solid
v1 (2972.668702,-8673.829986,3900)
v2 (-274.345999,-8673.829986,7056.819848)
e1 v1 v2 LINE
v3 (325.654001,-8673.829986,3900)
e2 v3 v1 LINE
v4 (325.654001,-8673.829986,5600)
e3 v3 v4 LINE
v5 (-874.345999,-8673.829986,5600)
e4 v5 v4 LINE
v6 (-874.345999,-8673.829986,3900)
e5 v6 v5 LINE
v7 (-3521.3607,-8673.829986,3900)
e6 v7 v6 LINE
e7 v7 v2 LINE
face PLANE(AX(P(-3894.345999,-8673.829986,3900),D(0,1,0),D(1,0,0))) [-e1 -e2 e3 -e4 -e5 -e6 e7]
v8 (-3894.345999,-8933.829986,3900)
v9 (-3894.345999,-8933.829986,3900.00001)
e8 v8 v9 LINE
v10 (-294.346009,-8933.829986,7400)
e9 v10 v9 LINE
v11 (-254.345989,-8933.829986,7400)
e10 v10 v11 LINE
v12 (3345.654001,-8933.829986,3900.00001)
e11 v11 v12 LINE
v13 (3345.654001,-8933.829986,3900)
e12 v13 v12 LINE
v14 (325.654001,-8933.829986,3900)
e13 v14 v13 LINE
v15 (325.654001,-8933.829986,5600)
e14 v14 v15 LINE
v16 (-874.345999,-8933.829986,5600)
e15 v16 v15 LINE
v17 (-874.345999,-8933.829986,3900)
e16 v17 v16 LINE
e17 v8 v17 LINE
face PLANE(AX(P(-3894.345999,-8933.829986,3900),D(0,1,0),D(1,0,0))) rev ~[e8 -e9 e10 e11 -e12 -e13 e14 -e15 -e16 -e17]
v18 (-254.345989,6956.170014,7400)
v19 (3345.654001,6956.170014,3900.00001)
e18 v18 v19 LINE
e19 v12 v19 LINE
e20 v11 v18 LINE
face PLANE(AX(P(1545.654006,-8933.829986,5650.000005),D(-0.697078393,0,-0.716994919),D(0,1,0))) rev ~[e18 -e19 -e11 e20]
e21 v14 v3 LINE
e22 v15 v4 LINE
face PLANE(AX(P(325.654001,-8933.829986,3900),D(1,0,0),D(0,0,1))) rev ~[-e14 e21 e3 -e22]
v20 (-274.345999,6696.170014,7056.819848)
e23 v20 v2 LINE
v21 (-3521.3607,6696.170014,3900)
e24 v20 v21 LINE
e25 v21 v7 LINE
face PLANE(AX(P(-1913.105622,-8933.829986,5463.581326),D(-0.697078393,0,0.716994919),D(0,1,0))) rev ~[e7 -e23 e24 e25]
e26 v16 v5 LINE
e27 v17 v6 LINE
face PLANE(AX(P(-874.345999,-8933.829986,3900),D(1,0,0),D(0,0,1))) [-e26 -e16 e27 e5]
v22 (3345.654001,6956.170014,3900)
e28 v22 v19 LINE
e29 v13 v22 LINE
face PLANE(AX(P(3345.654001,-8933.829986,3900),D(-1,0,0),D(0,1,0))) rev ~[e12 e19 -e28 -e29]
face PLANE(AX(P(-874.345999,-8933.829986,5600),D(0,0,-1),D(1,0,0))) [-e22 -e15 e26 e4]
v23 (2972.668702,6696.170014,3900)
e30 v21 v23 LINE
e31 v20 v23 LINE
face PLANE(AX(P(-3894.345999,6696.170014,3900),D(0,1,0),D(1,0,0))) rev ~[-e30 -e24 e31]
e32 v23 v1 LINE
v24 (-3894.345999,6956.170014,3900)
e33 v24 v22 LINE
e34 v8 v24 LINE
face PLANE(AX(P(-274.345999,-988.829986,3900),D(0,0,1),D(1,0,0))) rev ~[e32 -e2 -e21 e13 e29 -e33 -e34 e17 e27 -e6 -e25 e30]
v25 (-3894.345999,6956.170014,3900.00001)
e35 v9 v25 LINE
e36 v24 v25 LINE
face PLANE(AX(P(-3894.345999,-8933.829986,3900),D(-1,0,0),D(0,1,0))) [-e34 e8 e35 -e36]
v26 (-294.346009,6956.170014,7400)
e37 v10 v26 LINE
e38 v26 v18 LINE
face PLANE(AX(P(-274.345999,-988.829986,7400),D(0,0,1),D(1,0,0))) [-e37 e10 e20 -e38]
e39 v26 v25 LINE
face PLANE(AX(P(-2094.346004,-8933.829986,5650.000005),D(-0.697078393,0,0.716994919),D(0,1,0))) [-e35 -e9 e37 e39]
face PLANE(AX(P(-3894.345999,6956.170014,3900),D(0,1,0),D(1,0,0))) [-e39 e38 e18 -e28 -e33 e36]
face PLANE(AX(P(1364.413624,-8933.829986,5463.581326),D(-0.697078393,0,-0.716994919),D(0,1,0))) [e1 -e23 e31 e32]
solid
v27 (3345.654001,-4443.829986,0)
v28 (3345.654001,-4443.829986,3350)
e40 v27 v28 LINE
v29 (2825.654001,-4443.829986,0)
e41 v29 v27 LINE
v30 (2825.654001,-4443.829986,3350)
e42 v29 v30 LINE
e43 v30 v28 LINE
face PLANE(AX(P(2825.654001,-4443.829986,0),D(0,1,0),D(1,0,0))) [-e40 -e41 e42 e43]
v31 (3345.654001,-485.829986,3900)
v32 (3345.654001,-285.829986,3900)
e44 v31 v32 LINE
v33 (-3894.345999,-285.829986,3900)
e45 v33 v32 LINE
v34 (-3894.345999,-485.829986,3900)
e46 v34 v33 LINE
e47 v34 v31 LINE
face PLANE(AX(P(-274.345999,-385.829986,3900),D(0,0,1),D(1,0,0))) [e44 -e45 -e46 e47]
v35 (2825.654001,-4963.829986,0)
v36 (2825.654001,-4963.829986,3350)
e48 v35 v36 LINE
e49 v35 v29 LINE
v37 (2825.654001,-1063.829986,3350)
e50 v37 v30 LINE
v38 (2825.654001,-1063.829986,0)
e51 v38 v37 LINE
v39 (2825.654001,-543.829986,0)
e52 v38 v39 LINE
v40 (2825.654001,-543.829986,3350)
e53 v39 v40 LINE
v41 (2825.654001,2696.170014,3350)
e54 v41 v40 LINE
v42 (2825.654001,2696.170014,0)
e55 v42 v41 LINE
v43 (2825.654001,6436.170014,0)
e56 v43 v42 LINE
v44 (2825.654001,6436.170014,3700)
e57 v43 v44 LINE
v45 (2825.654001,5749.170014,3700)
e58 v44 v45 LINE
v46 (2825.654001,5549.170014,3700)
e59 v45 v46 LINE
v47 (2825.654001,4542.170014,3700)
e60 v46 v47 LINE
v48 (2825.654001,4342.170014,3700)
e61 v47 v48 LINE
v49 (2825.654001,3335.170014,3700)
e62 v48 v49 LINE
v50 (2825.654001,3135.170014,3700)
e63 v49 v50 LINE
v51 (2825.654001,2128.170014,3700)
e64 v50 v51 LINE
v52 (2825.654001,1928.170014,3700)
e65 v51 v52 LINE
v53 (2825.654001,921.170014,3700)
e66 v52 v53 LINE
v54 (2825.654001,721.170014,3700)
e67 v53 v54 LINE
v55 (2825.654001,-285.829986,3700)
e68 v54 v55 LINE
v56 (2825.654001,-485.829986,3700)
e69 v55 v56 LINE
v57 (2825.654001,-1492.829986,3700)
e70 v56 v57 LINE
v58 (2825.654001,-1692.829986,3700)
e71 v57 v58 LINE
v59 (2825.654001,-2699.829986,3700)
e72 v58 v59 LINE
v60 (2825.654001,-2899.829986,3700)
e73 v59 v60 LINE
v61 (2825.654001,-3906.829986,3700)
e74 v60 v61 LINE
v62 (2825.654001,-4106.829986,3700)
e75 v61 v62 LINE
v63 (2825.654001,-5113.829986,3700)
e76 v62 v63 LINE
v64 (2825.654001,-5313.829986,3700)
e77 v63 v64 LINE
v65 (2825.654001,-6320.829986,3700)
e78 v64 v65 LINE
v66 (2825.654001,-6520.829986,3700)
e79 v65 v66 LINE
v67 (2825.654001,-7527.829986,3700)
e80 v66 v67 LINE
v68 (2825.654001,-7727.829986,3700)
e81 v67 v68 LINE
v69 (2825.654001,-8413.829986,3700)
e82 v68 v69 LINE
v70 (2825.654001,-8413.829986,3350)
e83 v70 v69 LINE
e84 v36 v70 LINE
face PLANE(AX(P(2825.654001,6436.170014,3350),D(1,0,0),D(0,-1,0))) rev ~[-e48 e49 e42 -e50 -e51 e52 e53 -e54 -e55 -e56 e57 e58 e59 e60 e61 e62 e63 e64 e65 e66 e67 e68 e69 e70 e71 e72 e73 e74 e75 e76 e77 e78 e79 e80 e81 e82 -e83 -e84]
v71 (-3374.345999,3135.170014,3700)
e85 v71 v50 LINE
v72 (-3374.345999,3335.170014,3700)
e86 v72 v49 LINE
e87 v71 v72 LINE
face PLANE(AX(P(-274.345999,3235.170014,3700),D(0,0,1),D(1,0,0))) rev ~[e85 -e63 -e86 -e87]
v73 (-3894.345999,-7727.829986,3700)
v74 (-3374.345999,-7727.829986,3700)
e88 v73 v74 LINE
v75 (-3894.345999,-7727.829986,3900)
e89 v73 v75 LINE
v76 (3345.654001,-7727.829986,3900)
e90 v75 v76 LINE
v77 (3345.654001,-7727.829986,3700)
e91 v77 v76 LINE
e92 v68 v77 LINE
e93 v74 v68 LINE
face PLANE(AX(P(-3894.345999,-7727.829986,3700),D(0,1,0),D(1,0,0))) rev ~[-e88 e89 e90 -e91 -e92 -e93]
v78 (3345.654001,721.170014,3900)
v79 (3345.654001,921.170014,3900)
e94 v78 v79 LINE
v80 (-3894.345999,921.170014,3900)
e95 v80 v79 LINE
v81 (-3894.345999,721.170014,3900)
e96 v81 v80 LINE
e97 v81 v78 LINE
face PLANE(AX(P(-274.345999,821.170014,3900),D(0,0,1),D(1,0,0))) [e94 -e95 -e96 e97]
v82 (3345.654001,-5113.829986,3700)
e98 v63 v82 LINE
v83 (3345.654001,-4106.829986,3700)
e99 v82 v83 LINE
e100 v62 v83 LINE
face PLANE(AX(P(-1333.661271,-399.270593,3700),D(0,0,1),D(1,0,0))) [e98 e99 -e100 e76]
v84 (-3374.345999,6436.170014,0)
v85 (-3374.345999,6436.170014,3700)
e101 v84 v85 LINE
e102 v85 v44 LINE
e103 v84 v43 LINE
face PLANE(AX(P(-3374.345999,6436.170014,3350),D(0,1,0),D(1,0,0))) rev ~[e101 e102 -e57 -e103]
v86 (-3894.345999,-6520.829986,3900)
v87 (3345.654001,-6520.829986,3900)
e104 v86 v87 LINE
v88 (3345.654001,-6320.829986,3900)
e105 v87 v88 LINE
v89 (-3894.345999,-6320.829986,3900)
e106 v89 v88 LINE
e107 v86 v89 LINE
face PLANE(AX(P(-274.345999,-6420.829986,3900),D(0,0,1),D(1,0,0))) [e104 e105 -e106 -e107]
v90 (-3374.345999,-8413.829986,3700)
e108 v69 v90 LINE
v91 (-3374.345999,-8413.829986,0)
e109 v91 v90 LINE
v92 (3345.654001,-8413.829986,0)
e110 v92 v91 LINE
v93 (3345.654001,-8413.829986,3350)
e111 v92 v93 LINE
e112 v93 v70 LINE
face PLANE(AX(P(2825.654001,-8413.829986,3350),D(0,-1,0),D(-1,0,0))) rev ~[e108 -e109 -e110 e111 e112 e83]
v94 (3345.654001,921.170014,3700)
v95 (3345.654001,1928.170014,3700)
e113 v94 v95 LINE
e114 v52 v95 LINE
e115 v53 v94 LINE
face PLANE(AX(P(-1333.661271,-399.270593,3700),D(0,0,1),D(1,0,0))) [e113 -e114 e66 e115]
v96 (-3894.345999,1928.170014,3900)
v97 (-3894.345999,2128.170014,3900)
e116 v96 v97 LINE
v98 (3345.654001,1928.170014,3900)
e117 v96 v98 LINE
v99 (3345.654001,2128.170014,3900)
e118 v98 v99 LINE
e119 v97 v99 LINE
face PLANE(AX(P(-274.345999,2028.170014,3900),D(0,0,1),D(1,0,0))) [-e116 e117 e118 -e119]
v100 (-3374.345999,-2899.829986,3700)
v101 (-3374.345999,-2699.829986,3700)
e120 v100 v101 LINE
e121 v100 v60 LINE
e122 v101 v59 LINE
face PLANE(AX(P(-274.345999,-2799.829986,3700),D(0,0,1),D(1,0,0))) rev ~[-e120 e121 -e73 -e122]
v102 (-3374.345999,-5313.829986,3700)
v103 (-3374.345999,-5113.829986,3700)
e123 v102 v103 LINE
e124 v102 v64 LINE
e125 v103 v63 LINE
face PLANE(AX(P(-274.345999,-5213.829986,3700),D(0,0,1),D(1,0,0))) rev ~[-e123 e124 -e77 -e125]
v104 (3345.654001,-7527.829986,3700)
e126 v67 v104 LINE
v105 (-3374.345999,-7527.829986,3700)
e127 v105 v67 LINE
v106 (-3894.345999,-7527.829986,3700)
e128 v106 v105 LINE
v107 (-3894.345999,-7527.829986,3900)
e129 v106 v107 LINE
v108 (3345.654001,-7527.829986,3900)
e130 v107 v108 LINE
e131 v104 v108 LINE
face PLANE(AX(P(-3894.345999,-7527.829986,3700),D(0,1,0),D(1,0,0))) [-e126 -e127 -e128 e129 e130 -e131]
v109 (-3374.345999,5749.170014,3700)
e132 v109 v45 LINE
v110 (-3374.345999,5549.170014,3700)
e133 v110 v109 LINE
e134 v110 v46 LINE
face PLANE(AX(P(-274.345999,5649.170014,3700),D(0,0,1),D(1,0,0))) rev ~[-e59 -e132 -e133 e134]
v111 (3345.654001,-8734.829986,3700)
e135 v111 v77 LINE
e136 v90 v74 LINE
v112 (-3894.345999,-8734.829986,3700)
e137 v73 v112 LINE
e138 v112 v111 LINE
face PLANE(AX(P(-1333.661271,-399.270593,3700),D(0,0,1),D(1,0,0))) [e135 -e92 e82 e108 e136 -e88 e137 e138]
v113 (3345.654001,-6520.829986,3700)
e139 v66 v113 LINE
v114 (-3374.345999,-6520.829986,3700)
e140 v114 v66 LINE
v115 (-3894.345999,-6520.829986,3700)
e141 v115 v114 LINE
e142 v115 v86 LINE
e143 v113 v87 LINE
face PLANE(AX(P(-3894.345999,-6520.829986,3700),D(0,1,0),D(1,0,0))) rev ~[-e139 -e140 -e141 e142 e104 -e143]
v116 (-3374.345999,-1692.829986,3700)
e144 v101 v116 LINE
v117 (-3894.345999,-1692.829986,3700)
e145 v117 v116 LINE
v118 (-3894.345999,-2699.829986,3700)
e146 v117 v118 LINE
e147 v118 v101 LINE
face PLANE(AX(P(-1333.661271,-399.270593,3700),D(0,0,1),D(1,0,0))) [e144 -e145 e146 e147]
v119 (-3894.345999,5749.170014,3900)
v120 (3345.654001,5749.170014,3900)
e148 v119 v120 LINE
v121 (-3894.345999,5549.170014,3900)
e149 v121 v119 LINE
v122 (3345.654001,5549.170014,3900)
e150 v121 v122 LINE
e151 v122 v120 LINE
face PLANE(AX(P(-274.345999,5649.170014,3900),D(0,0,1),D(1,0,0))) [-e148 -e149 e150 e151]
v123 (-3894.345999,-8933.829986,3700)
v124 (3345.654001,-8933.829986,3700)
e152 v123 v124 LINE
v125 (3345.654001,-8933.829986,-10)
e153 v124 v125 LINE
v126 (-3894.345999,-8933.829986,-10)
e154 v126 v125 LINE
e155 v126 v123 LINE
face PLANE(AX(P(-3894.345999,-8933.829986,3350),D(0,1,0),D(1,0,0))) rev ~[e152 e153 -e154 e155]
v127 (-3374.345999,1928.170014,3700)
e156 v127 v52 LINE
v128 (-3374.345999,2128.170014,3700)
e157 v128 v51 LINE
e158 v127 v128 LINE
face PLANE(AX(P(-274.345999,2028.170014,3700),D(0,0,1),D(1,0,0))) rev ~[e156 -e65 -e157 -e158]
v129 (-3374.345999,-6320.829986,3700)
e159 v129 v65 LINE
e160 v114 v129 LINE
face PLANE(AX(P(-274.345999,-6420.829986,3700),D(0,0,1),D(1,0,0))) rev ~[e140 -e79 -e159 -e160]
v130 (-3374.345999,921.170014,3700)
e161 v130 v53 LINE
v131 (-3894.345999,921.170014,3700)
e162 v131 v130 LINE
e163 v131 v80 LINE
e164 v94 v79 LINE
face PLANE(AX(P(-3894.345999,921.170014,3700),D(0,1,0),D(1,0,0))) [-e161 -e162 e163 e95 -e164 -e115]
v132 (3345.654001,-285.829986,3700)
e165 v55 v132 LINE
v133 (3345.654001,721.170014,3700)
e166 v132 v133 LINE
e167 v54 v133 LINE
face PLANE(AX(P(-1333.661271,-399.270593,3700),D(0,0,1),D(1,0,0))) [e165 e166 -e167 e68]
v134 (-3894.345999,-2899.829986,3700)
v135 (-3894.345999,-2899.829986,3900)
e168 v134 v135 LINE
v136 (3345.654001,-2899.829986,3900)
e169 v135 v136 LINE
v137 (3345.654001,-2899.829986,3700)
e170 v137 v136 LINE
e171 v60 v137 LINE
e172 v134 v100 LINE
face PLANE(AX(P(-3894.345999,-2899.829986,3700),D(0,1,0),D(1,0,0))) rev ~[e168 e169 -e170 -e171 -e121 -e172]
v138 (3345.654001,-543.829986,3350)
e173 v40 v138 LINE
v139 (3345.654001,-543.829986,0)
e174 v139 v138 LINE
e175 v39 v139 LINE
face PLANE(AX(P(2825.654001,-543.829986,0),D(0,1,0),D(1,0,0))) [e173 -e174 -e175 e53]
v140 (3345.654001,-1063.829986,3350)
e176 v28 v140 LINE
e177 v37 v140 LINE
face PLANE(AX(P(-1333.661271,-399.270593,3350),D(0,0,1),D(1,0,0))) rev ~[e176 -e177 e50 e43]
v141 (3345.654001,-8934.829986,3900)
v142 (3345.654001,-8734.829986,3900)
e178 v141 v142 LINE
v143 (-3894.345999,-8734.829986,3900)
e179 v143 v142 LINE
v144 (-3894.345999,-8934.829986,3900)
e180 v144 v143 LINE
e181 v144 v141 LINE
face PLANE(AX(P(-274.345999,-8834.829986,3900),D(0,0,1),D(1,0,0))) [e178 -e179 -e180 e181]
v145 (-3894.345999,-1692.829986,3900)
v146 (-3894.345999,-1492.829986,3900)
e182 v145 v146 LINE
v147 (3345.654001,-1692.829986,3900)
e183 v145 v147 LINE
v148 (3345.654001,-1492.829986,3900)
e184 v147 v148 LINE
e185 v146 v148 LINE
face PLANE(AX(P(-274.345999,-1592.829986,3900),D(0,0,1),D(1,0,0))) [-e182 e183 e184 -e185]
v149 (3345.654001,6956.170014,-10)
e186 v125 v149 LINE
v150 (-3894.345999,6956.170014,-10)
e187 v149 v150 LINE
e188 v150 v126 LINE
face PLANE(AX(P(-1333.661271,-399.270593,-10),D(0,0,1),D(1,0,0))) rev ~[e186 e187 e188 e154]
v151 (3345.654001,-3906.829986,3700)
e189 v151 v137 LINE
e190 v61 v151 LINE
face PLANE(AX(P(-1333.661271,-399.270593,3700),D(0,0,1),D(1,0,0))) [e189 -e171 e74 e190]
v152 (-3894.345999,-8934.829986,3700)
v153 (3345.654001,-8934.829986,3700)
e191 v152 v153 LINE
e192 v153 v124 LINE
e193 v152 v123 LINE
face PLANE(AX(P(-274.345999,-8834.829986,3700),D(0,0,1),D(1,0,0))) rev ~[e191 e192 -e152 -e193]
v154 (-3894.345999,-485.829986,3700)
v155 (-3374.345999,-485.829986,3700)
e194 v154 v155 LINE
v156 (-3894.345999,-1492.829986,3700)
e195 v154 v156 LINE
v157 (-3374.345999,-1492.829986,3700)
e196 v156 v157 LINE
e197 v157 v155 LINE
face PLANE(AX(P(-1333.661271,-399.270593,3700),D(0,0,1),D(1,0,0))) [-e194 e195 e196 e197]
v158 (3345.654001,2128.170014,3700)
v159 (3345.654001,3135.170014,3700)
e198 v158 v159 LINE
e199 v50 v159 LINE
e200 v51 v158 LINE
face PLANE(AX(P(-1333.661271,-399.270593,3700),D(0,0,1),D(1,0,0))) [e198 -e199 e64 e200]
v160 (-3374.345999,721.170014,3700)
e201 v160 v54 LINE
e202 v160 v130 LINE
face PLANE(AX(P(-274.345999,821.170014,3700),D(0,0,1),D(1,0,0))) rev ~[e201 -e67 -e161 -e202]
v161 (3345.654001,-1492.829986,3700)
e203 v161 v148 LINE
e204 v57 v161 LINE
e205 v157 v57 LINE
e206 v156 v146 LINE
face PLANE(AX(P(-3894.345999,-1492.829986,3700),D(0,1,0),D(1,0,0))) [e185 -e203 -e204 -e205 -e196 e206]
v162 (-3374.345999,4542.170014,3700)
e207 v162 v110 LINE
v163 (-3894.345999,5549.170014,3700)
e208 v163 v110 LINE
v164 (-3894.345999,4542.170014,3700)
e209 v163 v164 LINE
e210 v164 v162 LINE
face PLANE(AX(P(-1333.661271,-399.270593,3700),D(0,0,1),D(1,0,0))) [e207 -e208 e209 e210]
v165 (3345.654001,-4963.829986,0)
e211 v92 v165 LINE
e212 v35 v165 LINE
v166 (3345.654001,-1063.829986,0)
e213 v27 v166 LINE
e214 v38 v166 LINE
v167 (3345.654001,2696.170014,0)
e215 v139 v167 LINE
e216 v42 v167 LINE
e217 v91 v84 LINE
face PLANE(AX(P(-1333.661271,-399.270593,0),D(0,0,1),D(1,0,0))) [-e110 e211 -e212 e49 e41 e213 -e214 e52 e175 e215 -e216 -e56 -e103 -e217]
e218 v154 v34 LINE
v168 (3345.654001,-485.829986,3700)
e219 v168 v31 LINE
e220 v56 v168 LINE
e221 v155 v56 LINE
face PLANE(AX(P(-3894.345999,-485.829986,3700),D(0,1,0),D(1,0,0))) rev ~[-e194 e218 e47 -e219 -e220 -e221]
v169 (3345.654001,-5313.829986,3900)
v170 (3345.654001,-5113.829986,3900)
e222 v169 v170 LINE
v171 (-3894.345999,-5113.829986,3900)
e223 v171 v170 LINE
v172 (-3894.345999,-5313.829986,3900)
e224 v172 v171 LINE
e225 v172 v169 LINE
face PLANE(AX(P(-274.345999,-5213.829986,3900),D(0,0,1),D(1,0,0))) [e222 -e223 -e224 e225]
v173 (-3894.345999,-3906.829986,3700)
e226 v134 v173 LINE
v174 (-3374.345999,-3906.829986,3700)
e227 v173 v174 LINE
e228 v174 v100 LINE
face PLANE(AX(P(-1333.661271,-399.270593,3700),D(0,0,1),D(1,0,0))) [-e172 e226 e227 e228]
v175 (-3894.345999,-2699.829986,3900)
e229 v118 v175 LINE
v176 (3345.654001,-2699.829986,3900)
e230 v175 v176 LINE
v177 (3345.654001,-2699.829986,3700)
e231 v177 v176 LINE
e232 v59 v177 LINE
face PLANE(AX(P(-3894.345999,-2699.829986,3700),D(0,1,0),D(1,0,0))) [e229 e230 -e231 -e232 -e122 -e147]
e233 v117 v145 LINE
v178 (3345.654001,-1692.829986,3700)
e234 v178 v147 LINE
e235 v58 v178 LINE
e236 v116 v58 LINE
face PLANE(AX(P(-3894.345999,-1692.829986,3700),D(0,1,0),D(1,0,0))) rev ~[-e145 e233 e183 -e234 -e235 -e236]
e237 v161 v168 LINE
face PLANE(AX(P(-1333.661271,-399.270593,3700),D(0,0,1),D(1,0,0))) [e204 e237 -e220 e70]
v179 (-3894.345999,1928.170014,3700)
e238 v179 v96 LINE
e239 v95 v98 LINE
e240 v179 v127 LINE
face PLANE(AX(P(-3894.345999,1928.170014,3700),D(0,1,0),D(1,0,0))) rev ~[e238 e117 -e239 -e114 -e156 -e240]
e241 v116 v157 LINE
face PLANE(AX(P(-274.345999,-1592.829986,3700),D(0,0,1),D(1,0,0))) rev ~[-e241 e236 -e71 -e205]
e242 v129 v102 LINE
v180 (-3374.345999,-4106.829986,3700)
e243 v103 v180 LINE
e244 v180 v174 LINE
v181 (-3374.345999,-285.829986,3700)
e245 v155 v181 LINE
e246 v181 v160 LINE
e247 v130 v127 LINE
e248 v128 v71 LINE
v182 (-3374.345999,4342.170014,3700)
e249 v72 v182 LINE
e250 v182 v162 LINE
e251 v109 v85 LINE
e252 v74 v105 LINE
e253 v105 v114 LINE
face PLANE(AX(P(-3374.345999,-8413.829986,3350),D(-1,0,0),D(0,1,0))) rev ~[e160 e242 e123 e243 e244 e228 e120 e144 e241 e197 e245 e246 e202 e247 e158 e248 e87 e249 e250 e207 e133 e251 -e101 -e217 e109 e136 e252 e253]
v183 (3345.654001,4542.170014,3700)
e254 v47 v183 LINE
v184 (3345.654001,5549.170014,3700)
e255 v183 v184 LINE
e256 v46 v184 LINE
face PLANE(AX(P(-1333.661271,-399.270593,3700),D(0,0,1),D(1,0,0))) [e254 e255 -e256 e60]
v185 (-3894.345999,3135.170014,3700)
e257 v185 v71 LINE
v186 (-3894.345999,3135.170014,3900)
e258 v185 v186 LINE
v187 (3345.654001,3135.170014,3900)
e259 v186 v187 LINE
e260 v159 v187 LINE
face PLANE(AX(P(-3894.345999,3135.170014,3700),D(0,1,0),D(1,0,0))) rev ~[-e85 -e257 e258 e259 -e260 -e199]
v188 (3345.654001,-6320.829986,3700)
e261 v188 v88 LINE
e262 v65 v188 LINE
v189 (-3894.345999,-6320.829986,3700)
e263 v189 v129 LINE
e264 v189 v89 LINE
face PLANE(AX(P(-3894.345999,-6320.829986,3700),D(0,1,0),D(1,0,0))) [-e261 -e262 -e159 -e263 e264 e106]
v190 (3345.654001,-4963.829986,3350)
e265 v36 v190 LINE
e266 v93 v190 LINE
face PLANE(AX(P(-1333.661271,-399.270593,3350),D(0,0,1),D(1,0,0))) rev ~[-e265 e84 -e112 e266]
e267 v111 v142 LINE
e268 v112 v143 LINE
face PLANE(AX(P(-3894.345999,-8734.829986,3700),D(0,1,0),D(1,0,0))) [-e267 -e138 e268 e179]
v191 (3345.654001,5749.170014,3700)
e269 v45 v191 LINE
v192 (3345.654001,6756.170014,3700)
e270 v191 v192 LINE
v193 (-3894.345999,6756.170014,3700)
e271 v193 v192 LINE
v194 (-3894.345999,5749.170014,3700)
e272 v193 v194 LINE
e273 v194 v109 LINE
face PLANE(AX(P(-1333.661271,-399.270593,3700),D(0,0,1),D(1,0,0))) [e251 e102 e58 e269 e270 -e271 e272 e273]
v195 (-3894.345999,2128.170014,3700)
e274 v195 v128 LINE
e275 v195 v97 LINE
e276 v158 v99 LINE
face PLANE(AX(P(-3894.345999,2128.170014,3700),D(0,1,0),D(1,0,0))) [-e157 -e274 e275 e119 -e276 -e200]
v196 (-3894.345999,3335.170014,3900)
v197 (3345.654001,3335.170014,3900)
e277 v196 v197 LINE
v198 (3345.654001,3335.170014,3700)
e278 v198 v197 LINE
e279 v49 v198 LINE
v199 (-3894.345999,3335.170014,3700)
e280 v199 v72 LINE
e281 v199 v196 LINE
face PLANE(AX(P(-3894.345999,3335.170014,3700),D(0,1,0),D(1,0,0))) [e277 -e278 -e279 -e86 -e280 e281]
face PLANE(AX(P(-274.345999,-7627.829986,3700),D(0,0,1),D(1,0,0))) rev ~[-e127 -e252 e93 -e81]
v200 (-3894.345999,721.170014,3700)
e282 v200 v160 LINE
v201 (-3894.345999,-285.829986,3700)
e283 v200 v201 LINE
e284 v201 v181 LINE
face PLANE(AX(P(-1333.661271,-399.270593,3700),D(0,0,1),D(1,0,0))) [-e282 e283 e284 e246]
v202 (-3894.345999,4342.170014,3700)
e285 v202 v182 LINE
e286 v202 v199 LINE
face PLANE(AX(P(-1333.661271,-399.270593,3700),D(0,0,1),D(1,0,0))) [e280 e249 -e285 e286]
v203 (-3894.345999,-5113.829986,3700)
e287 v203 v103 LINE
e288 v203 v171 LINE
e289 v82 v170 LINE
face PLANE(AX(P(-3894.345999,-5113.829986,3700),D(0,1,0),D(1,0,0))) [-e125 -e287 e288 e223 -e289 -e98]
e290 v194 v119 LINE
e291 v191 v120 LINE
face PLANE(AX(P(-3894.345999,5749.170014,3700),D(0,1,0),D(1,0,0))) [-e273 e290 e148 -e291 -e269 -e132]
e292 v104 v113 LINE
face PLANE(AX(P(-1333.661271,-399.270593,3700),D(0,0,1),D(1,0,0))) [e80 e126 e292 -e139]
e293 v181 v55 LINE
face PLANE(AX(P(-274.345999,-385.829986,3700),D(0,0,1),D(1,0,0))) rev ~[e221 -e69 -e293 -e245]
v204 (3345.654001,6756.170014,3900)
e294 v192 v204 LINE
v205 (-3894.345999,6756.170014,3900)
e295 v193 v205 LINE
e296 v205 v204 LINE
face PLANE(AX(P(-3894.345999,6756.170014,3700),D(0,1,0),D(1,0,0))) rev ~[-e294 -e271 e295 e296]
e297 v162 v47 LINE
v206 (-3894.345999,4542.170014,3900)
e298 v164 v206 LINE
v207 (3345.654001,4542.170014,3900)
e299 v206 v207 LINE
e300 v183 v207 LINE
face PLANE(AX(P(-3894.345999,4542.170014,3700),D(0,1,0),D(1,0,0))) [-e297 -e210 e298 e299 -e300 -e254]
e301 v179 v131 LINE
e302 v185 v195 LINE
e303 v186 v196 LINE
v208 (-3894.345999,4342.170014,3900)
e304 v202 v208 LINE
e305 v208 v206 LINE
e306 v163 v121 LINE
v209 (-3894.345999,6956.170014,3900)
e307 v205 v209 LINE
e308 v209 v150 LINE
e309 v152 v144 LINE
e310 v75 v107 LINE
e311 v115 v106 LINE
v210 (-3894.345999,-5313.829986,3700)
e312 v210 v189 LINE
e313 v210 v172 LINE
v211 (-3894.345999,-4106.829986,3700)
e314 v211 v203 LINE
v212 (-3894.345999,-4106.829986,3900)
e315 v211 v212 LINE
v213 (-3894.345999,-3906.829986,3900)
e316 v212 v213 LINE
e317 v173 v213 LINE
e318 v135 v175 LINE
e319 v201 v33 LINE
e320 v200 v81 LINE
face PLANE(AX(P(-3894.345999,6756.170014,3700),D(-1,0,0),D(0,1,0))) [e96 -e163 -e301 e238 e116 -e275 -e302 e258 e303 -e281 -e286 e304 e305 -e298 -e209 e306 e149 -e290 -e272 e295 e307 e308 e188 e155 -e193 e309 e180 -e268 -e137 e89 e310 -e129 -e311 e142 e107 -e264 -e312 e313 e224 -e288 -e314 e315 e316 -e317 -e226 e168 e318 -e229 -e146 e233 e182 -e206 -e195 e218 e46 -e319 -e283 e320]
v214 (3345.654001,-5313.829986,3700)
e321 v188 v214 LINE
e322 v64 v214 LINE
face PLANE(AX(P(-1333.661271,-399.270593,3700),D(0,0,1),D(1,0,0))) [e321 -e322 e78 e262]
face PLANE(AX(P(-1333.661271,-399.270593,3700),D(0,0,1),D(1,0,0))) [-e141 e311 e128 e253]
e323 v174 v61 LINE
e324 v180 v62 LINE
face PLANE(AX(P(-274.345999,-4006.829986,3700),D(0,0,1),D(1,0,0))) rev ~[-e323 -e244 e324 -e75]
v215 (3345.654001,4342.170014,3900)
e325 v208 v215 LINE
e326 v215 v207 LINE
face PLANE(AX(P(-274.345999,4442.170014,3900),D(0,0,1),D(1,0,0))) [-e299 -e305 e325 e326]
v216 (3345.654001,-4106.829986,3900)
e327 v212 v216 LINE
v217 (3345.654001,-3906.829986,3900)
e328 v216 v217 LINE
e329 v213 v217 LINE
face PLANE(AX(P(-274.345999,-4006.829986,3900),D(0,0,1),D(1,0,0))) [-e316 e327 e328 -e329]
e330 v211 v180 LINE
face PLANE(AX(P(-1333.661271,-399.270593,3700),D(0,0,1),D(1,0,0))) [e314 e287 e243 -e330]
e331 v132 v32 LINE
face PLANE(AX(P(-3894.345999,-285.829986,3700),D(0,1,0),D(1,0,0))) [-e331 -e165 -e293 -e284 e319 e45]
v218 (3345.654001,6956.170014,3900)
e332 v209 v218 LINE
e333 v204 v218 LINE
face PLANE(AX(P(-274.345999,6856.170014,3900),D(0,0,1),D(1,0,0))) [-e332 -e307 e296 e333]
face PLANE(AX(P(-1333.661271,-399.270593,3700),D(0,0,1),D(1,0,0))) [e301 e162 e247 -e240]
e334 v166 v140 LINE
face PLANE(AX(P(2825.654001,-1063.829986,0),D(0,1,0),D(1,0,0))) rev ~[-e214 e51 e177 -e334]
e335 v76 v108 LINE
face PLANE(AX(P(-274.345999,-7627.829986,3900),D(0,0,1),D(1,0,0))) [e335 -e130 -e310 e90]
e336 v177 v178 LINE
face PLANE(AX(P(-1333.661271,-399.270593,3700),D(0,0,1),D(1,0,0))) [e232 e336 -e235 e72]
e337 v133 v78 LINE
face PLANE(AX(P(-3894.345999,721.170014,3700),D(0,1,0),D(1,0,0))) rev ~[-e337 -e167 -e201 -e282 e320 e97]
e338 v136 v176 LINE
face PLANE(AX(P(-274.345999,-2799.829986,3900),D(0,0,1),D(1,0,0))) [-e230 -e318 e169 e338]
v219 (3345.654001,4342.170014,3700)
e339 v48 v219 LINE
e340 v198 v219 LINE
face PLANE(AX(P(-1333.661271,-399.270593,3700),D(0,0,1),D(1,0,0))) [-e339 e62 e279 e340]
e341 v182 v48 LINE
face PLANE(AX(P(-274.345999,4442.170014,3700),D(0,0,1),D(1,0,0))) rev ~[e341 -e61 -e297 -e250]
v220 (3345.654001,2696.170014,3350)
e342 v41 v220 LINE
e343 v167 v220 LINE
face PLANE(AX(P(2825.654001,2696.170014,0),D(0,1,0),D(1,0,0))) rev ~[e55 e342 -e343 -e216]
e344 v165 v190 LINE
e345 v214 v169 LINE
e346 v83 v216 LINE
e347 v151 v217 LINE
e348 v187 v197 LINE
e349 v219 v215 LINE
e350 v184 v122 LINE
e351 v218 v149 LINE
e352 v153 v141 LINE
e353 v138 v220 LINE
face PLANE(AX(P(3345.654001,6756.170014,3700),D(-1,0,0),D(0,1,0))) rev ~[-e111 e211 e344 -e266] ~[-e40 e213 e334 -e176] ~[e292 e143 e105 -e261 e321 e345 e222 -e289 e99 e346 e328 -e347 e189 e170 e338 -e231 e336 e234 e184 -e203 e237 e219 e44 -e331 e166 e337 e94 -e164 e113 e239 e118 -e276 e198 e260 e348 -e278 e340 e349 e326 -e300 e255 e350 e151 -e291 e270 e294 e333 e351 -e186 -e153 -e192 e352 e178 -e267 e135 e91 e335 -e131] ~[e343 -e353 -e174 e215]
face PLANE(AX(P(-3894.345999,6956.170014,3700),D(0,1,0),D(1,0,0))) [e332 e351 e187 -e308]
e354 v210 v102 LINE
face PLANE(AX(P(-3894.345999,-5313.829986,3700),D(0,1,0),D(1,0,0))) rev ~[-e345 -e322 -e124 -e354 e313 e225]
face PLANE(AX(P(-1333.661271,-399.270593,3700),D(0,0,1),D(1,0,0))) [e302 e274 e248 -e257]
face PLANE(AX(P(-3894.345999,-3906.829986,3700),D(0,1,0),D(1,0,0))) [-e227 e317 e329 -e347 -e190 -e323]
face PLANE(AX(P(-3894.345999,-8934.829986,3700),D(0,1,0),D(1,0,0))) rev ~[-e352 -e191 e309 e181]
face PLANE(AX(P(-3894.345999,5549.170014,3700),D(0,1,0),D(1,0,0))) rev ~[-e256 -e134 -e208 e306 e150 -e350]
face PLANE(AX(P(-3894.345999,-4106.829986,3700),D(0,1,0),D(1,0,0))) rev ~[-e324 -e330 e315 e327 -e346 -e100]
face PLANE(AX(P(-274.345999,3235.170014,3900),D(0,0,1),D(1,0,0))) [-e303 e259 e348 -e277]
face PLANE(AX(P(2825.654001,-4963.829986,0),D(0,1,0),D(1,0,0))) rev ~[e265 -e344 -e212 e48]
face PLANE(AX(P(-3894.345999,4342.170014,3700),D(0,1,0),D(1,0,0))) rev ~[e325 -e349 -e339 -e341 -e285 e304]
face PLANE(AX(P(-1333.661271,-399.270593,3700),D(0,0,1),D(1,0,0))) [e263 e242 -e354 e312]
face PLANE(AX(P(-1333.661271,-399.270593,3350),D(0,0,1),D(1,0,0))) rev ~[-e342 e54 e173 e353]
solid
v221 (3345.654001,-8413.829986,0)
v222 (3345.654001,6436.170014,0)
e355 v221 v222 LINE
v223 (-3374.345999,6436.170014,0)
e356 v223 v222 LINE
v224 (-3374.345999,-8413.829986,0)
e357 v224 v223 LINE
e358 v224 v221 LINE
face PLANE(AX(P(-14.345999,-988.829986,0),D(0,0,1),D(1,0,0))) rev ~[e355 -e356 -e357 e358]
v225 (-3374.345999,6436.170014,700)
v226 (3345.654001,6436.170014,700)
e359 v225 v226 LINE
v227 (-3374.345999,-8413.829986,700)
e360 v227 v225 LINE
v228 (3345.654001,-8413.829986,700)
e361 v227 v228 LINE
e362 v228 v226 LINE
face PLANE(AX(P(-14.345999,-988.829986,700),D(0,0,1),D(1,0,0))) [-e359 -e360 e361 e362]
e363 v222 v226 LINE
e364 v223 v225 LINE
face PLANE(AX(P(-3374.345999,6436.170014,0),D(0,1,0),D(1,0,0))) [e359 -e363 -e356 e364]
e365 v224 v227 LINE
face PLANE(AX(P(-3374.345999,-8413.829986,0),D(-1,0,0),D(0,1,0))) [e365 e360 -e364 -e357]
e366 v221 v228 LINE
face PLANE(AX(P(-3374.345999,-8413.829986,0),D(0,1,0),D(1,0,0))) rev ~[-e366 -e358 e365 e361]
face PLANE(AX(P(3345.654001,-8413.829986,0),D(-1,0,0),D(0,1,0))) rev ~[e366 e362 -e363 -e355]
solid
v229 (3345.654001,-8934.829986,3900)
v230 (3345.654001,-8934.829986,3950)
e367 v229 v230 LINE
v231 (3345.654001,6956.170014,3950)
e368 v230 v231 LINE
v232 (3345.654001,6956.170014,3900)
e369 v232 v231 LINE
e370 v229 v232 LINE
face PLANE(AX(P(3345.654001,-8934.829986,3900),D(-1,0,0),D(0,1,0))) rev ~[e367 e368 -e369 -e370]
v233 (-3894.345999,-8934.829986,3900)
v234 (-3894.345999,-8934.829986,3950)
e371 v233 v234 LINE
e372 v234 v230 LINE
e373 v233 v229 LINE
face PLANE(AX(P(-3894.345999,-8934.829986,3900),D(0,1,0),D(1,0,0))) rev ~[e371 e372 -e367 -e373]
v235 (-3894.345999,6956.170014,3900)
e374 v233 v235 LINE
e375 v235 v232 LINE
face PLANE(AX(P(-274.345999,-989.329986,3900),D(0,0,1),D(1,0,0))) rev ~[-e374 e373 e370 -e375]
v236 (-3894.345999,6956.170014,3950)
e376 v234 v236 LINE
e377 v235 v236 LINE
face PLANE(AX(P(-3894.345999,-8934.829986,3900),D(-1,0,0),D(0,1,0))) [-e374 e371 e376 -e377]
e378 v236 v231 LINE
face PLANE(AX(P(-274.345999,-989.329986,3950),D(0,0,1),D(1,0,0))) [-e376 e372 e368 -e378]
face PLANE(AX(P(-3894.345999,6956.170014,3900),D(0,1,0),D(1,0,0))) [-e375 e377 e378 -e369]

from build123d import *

# Parameters (mm, degrees)
F0_W      = 520
F0_H      = 3240
F0_H_2    = 520
F0_H_3    = 3380
F0_H_4    = 3450
F1_DEPTH  = 10
F2_DEPTH  = 3350
F3_W      = 520
F3_H      = 11110
F4_DEPTH  = 350
F5_W      = 7240
F5_H      = 200
F6_DEPTH  = 200
F7_W      = 7240
F7_H      = 15890
F8_DEPTH  = 3500
F9_SIZE2  = 3499.99999
F9_SIZE   = 3599.99999
F10_T     = 260
F11_W     = 1200
F11_H     = 1700
F12_DEPTH = 260
F13_W     = 6720
F13_H     = 14850
F14_DEPTH = 700
F15_W     = 7240
F15_H     = 15891
F16_DEPTH = 50


# Not quite as in the source:
# - a fillet or chamfer is up to 0.001 mm smaller than in the source, because OpenCascade refuses the exact size
# - a shell that OpenCascade refuses in one call is made with other operations: the cavity is built on its own and cut out


with BuildPart() as f1:
    # F0 (on Top) → F1 (new body)
    with BuildSketch(Plane.XY):
        Polygon((-3374.345998764, -8413.8299859681), (-3374.345998764, 6436.1700140319), (2825.654001236, 6436.1700140319), (2825.654001236, 2696.170014032), (3345.654001236, 2696.170014032), (3345.654001236, 6956.1700140319), (-3894.345998764, 6956.1700140319), (-3894.345998764, -8933.8299859681), (3345.654001236, -8933.8299859681), (3345.654001236, -8413.8299859681), (2825.654001236, -8413.8299859681), align=None)
        Polygon((2825.654001236, 6436.1700140319), (-3374.345998764, 6436.1700140319), (-3374.345998764, -8413.8299859681), (2825.654001236, -8413.8299859681), (2825.654001236, -4963.8299859681), (2825.654001236, -4443.829985968), (2825.654001236, -1063.8299859681), (2825.654001236, -543.829985968), (2825.654001236, 2696.170014032), align=None)
        with Locations((3085.654001236, 1076.170014032)):
            Rectangle(F0_W, F0_H)
        with Locations((3085.654001236, -803.829985968)):
            Rectangle(F0_W, F0_H_2)
        with Locations((3085.654001236, -2753.829985968)):
            Rectangle(F0_W, F0_H_3)
        with Locations((3085.654001236, -6688.8299859681)):
            Rectangle(F0_W, F0_H_4)
        with Locations((3085.654001236, -4703.8299859681)):
            Rectangle(F0_W, F0_H_2)
    extrude(amount=-F1_DEPTH)

    # F0 (on Top) → F2 (join)
    with BuildSketch(Plane.XY):
        with Locations((3085.654001236, -803.829985968)):
            Rectangle(F0_W, F0_H_2)
        with Locations((3085.654001236, -4703.8299859681)):
            Rectangle(F0_W, F0_H_2)
        Polygon((-3374.345998764, -8413.8299859681), (-3374.345998764, 6436.1700140319), (2825.654001236, 6436.1700140319), (2825.654001236, 2696.170014032), (3345.654001236, 2696.170014032), (3345.654001236, 6956.1700140319), (-3894.345998764, 6956.1700140319), (-3894.345998764, -8933.8299859681), (3345.654001236, -8933.8299859681), (3345.654001236, -8413.8299859681), (2825.654001236, -8413.8299859681), align=None)
    extrude(amount=F2_DEPTH)

    # F3 (on face) → F4 (join)
    with BuildSketch(Plane.XY.offset(3350)):
        Polygon((3345.654001236, 6956.1700140319), (-3894.345998764, 6956.1700140319), (-3894.345998764, -8933.8299859681), (3345.654001236, -8933.8299859681), (3345.654001236, -8413.8299859681), (2825.654001236, -8413.8299859681), (-3374.345998764, -8413.8299859681), (-3374.345998764, 6436.1700140319), (2825.654001236, 6436.1700140319), (2825.654001236, 2696.170014032), (3345.654001236, 2696.170014032), align=None)
        with Locations((3085.654001236, -2858.8299859681)):
            Rectangle(F3_W, F3_H)
    extrude(amount=F4_DEPTH)

    # F5 (on face) → F6 (join)
    with BuildSketch(Plane.XY.offset(3700)):
        with Locations((-274.345998764, 6856.1700140319)):
            Rectangle(F5_W, F5_H)
        with Locations((-274.345998764, 5649.1700140319)):
            Rectangle(F5_W, F5_H)
        with Locations((-274.345998764, 4442.1700140319)):
            Rectangle(F5_W, F5_H)
        with Locations((-274.345998764, 3235.1700140319)):
            Rectangle(F5_W, F5_H)
        with Locations((-274.345998764, 2028.1700140319)):
            Rectangle(F5_W, F5_H)
        with Locations((-274.345998764, 821.1700140319)):
            Rectangle(F5_W, F5_H)
        with Locations((-274.345998764, -385.8299859681)):
            Rectangle(F5_W, F5_H)
        with Locations((-274.345998764, -1592.8299859681)):
            Rectangle(F5_W, F5_H)
        with Locations((-274.345998764, -2799.8299859681)):
            Rectangle(F5_W, F5_H)
        with Locations((-274.345998764, -4006.8299859681)):
            Rectangle(F5_W, F5_H)
        with Locations((-274.345998764, -5213.8299859681)):
            Rectangle(F5_W, F5_H)
        with Locations((-274.345998764, -6420.8299859681)):
            Rectangle(F5_W, F5_H)
        with Locations((-274.345998764, -7627.8299859681)):
            Rectangle(F5_W, F5_H)
        with Locations((-274.345998764, -8834.8299859681)):
            Rectangle(F5_W, F5_H)
    extrude(amount=F6_DEPTH)


with BuildPart() as f8:
    # F7 (on face) → F8 (new body)
    with BuildSketch(Plane.XY.offset(3900)):
        with Locations((-274.345998764, -988.8299859681)):
            Rectangle(F7_W, F7_H)
    extrude(amount=F8_DEPTH)

    # F9 (size 3600 and 3500 in the source; OpenCascade refuses exactly that, so slightly less here)
    f9_edges = [f8.edges().sort_by_distance(p)[0] for p in [
        (-3894.345999, -988.829986, 7400),
        (3345.654001, -988.829986, 7400),
    ]]
    f9_side = f8.faces().sort_by_distance((-274.345999, -988.829986, 7400))[0]
    chamfer(f9_edges, length=F9_SIZE, length2=F9_SIZE2, reference=f9_side)

    # F10: shell of thickness 260, made by hand


with BuildPart() as f10_core1:
    # F10_t2: copy of F8
    add(f8.part)

    # the walls: a layer under each face that stays
    f10_faces = [f10_core1.faces().sort_by_distance(p)[0] for p in [
        (-274.3459987642, -8933.8299859681, 5650.0000000001),
        (-3894.345998764, -988.8299859681, 3900.0000050002),
        (-2094.3460037642, -988.8299859681, 5650.0000050002),
        (-274.345998764, -988.8299859681, 7400),
        (3345.654001236, -988.8299859681, 3900.0000050002),
        (1545.6540062361, -988.8299859681, 5650.0000050002),
        (-274.3459987639, 6956.1700140319, 5650.0000000001),
    ]]
    thicken(f10_faces, amount=-F10_T, mode=Mode.SUBTRACT)


with BuildPart() as f8_1:
    add(f8.part)

    # what is left inside the walls is the cavity
    f10_cavity = [f10_core1.part.solids().sort_by_distance(p)[0] for p in [
        (-274.345999, -3550.496653, 3902.6),
    ]]
    add(f10_cavity, mode=Mode.SUBTRACT)

    # F11 (on face) → F12 (cut)
    with BuildSketch(Plane.XZ.offset(8933.8299859681)):
        with Locations((-274.345998764, 4750)):
            Rectangle(F11_W, F11_H)
    extrude(amount=-F12_DEPTH, mode=Mode.SUBTRACT)


with BuildPart() as f14:
    # F13 (on face) → F14 (new body)
    with BuildSketch(Plane.XY):
        with Locations((-14.345998764, -988.8299859681)):
            Rectangle(F13_W, F13_H)
    extrude(amount=F14_DEPTH)


with BuildPart() as f16:
    # F15 (on face) → F16 (new body)
    with BuildSketch(Plane.XY.offset(3900)):
        with Locations((-274.345998764, -989.3299859681)):
            Rectangle(F15_W, F15_H)
    extrude(amount=F16_DEPTH)


solid = Compound([f1.part, f8_1.part, f14.part, f16.part])
